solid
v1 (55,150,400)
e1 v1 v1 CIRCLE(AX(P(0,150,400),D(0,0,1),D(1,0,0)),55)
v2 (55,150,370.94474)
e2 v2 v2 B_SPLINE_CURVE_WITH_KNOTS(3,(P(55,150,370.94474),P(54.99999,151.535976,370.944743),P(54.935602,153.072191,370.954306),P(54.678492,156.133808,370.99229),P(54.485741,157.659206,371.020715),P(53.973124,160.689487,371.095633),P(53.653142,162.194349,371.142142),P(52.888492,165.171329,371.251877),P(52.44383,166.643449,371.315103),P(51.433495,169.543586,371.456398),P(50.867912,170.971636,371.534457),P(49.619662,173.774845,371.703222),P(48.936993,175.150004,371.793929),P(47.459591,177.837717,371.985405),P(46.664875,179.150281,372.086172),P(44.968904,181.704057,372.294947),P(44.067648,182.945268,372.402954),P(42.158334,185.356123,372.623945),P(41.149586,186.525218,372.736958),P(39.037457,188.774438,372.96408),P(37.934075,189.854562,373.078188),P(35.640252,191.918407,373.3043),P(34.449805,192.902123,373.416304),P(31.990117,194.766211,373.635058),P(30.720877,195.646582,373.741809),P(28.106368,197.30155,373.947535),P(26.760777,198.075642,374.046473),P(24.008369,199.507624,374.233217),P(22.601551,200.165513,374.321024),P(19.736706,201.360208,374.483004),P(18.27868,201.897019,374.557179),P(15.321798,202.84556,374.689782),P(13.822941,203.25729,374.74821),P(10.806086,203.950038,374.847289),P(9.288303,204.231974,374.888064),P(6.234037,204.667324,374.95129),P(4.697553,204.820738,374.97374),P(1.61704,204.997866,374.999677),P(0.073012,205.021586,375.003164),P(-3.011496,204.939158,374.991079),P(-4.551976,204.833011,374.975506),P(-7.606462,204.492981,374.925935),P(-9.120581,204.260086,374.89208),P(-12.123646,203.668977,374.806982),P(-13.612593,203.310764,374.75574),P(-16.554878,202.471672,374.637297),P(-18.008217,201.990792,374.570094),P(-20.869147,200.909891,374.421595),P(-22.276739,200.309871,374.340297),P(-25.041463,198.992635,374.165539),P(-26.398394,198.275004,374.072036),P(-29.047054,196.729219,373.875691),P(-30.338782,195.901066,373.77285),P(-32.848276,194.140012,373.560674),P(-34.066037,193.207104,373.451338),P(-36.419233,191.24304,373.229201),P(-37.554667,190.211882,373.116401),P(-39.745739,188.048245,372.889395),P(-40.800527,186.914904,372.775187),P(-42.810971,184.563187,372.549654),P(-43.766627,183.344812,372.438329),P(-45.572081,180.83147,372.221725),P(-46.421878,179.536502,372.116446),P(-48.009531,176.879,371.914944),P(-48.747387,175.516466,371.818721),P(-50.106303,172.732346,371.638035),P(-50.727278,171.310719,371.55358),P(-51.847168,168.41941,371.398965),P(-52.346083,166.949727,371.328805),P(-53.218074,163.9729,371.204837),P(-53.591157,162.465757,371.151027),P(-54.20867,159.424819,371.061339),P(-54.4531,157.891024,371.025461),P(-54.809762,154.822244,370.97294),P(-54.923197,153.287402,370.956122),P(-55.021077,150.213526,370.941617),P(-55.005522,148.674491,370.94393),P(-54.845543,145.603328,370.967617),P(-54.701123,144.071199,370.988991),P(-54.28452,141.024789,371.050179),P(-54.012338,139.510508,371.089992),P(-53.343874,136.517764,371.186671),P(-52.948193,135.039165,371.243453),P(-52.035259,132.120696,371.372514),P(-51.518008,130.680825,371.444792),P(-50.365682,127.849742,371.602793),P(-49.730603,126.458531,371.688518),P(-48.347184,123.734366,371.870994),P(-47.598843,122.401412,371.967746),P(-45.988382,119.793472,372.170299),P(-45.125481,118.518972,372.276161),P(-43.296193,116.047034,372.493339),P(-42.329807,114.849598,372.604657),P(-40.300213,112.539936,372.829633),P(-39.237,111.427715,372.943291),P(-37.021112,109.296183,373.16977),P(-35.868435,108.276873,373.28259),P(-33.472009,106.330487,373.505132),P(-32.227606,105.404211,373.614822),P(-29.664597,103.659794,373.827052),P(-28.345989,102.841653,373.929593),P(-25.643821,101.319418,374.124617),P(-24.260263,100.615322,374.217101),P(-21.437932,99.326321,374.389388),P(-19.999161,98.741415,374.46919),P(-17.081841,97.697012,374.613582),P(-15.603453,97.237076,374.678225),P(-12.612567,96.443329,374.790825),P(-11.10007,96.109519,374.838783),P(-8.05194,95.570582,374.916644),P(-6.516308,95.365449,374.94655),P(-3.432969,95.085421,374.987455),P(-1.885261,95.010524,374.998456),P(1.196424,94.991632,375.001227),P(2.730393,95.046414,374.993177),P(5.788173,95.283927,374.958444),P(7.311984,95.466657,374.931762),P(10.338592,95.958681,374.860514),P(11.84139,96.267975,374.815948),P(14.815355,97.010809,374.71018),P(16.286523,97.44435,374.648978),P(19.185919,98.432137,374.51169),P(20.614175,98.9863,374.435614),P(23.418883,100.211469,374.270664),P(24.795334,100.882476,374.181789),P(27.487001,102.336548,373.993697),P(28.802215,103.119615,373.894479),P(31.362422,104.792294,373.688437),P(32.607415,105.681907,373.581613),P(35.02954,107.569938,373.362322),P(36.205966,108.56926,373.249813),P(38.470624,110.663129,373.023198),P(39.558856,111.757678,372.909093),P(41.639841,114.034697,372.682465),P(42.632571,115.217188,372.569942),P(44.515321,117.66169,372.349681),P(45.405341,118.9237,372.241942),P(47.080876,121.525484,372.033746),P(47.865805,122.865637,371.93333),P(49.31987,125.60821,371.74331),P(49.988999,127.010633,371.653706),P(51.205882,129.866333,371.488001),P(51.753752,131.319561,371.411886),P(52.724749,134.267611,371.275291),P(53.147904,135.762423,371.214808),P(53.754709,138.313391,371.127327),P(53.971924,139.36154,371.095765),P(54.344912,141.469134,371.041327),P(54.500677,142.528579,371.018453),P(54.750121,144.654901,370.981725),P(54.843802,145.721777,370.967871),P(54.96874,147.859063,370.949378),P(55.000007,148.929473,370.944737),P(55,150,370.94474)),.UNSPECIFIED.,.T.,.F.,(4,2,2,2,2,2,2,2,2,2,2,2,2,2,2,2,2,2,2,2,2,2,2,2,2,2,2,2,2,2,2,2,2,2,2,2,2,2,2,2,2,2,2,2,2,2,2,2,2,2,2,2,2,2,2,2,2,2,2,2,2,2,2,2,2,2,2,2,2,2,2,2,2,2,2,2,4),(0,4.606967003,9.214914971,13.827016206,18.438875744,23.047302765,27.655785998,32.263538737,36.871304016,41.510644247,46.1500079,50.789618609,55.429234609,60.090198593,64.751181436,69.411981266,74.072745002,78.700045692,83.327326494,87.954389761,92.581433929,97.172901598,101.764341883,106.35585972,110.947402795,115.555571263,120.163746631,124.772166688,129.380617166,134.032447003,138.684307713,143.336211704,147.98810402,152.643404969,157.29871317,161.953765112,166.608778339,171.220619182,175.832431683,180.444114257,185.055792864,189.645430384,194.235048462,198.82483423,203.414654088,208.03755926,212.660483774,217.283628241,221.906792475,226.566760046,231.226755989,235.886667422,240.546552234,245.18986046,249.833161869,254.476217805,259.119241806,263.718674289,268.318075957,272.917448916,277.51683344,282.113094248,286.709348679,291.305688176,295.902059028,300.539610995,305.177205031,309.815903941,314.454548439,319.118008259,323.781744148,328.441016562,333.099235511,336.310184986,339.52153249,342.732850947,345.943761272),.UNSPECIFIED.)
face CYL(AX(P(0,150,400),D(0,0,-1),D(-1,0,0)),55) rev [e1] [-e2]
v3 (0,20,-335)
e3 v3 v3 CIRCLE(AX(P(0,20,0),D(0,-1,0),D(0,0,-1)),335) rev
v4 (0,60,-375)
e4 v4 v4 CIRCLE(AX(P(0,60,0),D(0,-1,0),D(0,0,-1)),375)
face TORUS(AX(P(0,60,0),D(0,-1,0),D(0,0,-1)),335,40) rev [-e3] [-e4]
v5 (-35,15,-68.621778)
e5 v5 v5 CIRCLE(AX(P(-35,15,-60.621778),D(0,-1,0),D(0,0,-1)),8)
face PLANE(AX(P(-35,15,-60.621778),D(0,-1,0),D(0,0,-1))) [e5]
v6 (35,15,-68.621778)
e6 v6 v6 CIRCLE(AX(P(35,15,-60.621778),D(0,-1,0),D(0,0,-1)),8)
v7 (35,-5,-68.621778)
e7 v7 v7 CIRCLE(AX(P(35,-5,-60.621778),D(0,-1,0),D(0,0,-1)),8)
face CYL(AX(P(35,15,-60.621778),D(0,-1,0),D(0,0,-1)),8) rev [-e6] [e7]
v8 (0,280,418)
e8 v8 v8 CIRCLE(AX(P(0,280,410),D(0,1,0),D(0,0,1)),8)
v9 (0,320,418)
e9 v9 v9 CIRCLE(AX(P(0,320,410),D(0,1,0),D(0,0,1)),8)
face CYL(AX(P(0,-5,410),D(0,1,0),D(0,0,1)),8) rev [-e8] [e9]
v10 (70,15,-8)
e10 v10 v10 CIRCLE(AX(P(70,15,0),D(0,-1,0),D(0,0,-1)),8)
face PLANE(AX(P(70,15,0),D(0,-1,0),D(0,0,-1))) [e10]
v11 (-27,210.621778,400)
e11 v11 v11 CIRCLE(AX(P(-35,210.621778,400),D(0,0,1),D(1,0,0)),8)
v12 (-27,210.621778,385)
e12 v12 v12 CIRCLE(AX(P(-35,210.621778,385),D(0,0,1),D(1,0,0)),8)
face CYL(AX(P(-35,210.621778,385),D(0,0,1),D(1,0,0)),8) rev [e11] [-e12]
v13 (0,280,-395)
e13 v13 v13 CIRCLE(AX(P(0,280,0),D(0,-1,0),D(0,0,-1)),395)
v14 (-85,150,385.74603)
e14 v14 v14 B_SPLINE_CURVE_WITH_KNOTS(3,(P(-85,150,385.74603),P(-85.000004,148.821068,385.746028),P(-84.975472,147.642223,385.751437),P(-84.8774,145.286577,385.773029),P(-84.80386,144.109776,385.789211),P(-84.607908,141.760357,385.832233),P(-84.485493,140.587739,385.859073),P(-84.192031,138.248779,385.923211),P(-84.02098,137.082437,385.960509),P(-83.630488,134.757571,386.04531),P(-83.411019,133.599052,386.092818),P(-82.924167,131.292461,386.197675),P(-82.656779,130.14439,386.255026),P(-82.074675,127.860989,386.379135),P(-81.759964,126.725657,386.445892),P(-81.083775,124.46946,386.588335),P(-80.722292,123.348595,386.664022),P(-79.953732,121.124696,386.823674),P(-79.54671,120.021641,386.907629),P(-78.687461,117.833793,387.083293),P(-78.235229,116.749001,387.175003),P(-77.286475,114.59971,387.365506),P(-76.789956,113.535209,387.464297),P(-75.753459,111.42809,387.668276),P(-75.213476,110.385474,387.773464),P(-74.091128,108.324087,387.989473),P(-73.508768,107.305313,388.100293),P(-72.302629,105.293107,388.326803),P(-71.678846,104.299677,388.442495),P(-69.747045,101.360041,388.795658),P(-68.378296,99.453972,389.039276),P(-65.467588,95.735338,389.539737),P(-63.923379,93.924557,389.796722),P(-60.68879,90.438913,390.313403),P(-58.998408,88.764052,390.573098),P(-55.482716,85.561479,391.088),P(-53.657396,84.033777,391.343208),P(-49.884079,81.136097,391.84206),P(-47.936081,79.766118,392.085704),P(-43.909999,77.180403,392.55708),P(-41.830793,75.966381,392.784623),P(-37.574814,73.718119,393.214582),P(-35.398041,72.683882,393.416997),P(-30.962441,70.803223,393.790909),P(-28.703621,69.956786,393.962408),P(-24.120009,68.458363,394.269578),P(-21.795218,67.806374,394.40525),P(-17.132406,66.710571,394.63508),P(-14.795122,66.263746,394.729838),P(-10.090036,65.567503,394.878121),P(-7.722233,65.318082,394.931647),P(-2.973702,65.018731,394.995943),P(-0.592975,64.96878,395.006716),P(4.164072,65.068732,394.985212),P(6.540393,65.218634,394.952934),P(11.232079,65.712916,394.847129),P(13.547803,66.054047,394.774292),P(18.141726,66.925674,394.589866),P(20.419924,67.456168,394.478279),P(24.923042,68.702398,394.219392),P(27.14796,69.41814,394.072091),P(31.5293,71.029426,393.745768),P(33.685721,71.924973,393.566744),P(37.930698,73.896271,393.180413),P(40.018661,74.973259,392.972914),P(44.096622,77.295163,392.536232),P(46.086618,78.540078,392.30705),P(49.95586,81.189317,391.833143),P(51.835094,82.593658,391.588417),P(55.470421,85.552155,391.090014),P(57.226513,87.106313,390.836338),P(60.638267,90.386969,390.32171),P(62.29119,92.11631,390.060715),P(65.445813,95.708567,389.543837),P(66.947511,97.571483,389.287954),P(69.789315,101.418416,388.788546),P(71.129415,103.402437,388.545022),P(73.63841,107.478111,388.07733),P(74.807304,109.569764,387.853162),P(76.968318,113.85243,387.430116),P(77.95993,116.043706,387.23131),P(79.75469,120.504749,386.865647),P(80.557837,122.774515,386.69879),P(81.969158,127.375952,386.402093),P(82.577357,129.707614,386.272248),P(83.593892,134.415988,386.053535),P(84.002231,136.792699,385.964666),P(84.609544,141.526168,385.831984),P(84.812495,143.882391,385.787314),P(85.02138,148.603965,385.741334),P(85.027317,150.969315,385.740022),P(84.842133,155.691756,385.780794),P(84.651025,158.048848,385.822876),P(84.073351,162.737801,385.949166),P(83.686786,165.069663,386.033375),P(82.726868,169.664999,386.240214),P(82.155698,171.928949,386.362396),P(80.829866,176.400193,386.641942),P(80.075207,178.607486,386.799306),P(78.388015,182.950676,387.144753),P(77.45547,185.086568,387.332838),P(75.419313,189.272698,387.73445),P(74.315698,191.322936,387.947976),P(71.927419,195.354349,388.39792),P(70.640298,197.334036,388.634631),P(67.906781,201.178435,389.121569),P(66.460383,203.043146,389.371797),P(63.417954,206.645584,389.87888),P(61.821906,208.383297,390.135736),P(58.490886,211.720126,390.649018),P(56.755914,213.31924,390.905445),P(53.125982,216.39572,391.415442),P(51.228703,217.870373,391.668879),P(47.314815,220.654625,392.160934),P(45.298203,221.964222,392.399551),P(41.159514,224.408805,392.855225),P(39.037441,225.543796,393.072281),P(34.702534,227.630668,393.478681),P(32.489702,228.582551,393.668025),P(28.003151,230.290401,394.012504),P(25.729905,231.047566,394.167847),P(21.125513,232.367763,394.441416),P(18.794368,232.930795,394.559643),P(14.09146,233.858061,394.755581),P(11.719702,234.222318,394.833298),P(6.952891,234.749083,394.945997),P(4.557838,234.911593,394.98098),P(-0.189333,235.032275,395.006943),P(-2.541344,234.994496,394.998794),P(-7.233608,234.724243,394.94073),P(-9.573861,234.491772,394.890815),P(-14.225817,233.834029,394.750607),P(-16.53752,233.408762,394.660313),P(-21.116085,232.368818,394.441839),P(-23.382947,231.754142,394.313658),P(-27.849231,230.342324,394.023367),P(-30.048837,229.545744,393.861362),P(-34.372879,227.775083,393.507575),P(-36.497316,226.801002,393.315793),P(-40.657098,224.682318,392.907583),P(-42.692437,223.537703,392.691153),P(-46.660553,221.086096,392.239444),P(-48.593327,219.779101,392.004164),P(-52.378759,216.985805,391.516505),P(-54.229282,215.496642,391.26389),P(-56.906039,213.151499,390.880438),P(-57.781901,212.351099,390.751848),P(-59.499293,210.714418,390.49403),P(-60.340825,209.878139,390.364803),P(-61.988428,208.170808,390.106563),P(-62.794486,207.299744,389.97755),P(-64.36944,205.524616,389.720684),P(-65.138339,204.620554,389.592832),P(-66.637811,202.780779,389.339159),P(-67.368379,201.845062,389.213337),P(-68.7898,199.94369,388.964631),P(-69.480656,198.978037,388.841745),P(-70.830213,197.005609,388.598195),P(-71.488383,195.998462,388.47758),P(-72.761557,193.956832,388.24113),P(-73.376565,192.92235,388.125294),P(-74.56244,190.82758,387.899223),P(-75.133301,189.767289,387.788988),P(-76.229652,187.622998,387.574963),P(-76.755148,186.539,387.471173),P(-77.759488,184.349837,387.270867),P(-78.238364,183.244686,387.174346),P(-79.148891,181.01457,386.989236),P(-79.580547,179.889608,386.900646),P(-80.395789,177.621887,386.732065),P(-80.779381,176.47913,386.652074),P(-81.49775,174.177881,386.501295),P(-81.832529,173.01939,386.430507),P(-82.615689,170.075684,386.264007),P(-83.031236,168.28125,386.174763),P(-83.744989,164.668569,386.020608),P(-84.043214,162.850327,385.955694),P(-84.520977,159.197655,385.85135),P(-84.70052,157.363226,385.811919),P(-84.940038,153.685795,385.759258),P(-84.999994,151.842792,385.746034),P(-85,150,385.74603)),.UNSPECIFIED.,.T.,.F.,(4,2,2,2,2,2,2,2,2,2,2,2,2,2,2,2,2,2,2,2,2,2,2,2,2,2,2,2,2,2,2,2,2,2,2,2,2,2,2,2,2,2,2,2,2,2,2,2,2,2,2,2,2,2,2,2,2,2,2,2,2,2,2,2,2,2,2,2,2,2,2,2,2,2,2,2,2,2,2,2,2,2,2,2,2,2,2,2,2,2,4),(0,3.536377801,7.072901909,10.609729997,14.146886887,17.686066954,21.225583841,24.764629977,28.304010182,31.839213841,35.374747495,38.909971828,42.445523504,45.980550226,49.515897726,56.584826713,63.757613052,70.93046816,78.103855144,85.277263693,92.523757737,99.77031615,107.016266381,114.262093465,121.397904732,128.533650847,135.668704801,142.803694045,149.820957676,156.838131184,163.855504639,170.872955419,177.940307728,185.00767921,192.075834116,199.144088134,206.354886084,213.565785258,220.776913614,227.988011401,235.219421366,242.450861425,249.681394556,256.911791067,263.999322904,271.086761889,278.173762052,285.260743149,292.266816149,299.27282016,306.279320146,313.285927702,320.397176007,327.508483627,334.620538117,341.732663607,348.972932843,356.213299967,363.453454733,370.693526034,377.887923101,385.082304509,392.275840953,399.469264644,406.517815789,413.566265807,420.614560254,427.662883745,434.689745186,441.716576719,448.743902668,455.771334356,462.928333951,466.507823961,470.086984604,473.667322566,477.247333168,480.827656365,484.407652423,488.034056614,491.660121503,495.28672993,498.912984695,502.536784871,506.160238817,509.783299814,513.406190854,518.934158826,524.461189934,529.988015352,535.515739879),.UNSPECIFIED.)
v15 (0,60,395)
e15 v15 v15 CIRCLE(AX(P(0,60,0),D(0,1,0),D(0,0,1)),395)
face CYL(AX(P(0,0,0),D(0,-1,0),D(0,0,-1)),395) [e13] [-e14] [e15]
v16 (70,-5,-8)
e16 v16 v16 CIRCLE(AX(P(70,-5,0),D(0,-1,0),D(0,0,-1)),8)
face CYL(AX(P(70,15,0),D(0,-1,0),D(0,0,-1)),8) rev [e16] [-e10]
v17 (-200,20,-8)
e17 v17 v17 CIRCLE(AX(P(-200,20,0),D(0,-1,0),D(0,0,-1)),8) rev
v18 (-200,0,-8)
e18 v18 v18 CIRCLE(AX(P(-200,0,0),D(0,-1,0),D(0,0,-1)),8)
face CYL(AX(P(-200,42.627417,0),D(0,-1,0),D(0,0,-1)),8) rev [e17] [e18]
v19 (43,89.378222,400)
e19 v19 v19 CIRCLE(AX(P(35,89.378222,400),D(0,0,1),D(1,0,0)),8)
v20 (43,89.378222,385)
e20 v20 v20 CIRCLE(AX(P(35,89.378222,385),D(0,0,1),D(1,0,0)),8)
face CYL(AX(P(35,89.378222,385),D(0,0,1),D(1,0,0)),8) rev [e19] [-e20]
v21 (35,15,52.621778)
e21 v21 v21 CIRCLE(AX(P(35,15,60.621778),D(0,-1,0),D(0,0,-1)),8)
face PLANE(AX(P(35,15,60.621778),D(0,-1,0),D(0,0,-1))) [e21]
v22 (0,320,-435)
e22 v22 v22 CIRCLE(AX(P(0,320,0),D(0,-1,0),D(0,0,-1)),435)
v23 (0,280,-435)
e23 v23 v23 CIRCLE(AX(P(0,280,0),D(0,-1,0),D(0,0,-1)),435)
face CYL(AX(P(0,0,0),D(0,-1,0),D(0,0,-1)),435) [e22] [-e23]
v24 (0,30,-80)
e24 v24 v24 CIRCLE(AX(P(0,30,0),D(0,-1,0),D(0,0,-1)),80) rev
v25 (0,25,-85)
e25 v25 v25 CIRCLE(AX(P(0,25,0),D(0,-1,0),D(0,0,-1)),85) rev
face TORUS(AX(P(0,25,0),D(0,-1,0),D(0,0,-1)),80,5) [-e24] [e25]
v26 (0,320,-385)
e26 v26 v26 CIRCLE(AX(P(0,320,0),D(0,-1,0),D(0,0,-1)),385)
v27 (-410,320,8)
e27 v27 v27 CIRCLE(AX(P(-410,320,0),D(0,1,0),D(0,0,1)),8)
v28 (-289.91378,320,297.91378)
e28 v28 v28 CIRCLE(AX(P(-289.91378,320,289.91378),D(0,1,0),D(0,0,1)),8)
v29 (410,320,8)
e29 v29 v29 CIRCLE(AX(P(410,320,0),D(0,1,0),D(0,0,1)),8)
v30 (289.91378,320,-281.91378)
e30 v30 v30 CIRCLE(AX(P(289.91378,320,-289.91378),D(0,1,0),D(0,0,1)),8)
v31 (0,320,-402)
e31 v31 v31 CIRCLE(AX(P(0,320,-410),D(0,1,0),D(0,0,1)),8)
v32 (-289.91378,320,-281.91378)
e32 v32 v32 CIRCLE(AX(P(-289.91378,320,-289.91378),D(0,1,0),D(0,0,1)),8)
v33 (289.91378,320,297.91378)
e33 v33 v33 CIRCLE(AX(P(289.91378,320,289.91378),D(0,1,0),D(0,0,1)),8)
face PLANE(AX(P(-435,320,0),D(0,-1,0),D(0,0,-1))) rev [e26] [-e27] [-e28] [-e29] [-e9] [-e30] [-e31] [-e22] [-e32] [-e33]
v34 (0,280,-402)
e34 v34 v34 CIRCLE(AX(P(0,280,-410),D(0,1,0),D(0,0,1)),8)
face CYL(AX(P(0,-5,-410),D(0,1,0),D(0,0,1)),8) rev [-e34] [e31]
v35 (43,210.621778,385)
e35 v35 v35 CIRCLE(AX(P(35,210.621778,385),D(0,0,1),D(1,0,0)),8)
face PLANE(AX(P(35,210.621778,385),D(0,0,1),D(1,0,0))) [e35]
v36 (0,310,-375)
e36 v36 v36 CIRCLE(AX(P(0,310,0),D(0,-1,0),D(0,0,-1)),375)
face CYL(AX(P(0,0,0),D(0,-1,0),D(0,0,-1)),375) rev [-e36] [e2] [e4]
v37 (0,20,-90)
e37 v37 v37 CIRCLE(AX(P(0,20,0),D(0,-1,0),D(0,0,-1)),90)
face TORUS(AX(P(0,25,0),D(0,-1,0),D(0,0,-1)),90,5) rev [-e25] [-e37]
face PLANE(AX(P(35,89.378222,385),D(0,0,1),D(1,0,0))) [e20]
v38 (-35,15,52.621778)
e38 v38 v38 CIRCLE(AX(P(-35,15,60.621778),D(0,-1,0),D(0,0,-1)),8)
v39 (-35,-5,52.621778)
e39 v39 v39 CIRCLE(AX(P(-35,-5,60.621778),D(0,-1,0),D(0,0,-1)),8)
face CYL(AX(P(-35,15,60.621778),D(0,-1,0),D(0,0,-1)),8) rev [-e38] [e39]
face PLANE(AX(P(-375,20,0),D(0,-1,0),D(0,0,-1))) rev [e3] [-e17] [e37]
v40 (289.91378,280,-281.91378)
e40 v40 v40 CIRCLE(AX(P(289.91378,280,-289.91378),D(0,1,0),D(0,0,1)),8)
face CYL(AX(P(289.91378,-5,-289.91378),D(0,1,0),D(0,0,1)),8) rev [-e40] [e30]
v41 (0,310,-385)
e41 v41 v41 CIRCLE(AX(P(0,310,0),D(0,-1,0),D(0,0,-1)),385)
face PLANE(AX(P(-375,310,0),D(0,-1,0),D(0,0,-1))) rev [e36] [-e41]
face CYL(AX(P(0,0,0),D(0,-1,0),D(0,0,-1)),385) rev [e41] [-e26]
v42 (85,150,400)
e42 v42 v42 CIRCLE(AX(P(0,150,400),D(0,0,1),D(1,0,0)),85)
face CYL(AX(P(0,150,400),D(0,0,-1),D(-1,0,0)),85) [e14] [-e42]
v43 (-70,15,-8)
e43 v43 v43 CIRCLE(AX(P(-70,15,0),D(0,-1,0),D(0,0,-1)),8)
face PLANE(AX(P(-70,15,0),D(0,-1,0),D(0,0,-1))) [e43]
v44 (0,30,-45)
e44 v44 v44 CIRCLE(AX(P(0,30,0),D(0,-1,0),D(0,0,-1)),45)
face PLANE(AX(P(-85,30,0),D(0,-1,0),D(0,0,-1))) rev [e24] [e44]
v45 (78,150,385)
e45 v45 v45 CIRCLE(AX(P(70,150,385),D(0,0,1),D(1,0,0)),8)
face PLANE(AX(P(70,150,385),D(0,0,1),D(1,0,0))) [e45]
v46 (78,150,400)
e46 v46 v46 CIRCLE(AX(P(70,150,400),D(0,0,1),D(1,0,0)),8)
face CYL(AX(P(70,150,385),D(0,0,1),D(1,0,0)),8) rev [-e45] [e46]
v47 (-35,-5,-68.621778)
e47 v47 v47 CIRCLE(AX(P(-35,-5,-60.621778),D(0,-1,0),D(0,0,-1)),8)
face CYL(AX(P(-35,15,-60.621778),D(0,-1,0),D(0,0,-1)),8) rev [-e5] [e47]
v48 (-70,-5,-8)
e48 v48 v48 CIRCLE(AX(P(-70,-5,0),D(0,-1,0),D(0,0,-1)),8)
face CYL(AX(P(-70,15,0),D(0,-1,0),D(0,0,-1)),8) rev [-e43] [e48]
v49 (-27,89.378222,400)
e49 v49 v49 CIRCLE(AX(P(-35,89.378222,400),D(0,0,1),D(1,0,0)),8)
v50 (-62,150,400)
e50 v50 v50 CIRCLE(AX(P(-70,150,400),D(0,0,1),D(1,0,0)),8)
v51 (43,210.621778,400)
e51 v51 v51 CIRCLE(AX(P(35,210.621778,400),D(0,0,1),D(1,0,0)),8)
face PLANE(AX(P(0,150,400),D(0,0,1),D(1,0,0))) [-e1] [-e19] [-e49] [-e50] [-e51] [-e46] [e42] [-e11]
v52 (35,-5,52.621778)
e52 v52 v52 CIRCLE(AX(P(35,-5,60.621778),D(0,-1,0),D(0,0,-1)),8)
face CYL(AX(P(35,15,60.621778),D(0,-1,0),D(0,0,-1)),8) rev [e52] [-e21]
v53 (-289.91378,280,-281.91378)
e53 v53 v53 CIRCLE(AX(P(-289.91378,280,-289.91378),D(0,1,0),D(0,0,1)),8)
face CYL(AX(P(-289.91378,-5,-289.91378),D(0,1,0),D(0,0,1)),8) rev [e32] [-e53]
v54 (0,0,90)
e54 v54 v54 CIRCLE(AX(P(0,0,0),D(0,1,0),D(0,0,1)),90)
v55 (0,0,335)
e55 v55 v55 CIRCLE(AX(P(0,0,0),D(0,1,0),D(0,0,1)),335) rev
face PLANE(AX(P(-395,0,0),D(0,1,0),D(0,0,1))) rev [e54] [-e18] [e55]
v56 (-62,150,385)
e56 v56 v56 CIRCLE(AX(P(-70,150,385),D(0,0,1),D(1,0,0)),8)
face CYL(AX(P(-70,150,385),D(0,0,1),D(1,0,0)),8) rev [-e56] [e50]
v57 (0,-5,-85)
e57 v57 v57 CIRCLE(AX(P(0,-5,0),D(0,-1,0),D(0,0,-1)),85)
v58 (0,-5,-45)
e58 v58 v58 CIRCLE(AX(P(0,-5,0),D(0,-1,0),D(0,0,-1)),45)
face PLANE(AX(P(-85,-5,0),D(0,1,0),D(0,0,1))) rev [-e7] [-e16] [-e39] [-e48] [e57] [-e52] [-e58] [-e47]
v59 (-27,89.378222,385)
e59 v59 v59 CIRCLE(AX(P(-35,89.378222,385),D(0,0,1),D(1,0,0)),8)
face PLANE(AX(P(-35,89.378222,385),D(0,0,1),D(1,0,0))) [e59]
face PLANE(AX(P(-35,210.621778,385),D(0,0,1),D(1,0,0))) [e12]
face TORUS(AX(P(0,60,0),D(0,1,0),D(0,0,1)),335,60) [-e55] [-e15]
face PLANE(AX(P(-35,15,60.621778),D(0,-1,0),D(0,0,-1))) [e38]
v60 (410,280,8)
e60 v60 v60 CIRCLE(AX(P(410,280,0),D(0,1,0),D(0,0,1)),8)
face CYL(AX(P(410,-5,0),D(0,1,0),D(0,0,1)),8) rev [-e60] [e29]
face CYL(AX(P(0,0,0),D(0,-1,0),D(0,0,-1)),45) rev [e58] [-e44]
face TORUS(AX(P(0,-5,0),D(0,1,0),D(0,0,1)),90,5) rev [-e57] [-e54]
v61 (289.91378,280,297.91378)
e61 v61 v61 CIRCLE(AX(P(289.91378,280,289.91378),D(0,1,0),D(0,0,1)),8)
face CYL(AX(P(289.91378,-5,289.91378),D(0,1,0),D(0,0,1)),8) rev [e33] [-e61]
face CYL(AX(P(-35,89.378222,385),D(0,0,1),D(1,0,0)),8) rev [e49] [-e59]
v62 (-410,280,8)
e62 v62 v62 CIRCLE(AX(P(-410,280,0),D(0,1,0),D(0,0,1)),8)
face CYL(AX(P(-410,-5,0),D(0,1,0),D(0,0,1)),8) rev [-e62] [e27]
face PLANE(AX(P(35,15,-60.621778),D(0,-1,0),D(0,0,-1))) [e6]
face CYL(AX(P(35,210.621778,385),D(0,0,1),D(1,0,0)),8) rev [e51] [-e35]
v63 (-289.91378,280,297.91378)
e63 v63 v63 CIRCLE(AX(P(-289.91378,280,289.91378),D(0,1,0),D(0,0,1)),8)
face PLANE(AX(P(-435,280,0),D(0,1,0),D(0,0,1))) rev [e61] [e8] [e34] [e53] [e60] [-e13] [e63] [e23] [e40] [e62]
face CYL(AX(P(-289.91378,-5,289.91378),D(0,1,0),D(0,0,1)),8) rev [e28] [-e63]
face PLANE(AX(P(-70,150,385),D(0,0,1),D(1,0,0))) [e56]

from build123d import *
from build123d.topology import SkipClean

# Parameters (mm, degrees)
FILLET1_R                            = 5
FILLET2_R                            = 60
FILLET3_R                            = 40
SKETCH2_R                            = 85
SKETCH2_R_2                          = 55
BOSS_EXTRUDE1_DEPTH                  = 5
BOSS_EXTRUDE1_DIRECTION_2_REACH      = 992.215
BOSS_EXTRUDE1_DIRECTION_2_END_RADIUS = 395
SKETCH3_R                            = 55
CUT_EXTRUDE1_DEPTH                   = 64
SKETCH4_R                            = 8
CUT_EXTRUDE2_DEPTH                   = 15
CUT_EXTRUDE3_DEPTH                   = 696.754985609
CUT_EXTRUDE3_DEPTH_BACK              = 696.754985609
SKETCH5_R                            = 8
SKETCH6_R                            = 8
CUT_EXTRUDE4_DEPTH                   = 20
SKETCH7_R                            = 8
CUT_EXTRUDE5_DEPTH                   = 20


with BuildPart() as part:
    # Sketch1 → Revolve1 (revolve)
    with BuildSketch(Plane.XY, mode=Mode.PRIVATE) as revolve1_sk:
        Polygon((-435, 320), (-385, 320), (-385, 310), (-375, 310), (-375, 20), (-85, 20), (-85, 30), (-45, 30), (-45, -5), (-85, -5), (-85, 0), (-395, 0), (-395, 280), (-435, 280), align=None)
    revolve(revolve1_sk.sketch.rotate(Axis((0, 0, 0), (0, 1, 0)), 270), axis=Axis((0, 0, 0), (0, 1, 0)))

    # Fillet1
    fillet1_edges = [part.edges().sort_by_distance(p)[0] for p in [
        (0, 0, 85),
        (0, 30, 85),
        (0, 20, 85),
    ]]
    fillet(fillet1_edges, radius=FILLET1_R - 0.0001)  # a hair under: the kernel refuses the full size

    # Fillet2
    fillet2_edges = [part.edges().sort_by_distance(p)[0] for p in [
        (0, 0, 395),
    ]]
    fillet(fillet2_edges, radius=FILLET2_R)

    # Fillet3
    fillet3_edges = [part.edges().sort_by_distance(p)[0] for p in [
        (0, 20, 375),
    ]]
    fillet(fillet3_edges, radius=FILLET3_R)

    # Sketch2 → Boss-Extrude1 (add)
    with BuildSketch(Plane.XY.offset(395)):
        with Locations(Location((0, 150, 0), (0, 0, 180))):
            Circle(SKETCH2_R)
        with Locations((0, 150)):
            Circle(SKETCH2_R_2, mode=Mode.SUBTRACT)
    extrude(amount=BOSS_EXTRUDE1_DEPTH)

    # Boss-Extrude1 direction 2: up to this cylinder (the profile starts outside it)
    with SkipClean():  # the faces are left unmerged after this step: merging them gives an invalid solid
        boss_extrude1_direction_2_end = Plane(origin=(0, 150, 0), z_dir=(0, -1, 0)) * Cylinder(BOSS_EXTRUDE1_DIRECTION_2_END_RADIUS, 2775.43, mode=Mode.PRIVATE)
        # Sketch2 → Boss-Extrude1 direction 2 (add, up to the surface)
        with BuildSketch(Plane.XY.offset(395), mode=Mode.PRIVATE) as boss_extrude1_direction_2_sk1:
            with Locations(Location((0, 150, 0), (0, 0, 180))):
                Circle(SKETCH2_R)
            with Locations((0, 150)):
                Circle(SKETCH2_R_2, mode=Mode.SUBTRACT)
        boss_extrude1_direction_2_tool1 = extrude(boss_extrude1_direction_2_sk1.sketch, amount=-BOSS_EXTRUDE1_DIRECTION_2_REACH, mode=Mode.PRIVATE) - boss_extrude1_direction_2_end
        add(boss_extrude1_direction_2_tool1.solids().sort_by_distance((82.595837, 150, 395))[0])
        add(boss_extrude1_direction_2_tool1.solids().sort_by_distance((82.595837, 150, 395))[1])

    # Sketch3 → Cut-Extrude1 (cut)
    with BuildSketch(Plane.XY.offset(400)):
        with Locations((0, 150)):
            Circle(SKETCH3_R)
    extrude(amount=-CUT_EXTRUDE1_DEPTH, mode=Mode.SUBTRACT)

    # Sketch4 → Cut-Extrude2 (cut)
    with BuildSketch(Plane.XY.offset(400)):
        with Locations((70, 150)):
            Circle(SKETCH4_R)
        with Locations((35, 89.378221735)):
            Circle(SKETCH4_R)
        with Locations((-35, 89.378221735)):
            Circle(SKETCH4_R)
        with Locations((-70, 150)):
            Circle(SKETCH4_R)
        with Locations((-35, 210.621778265)):
            Circle(SKETCH4_R)
        with Locations((35, 210.621778265)):
            Circle(SKETCH4_R)
    extrude(amount=-CUT_EXTRUDE2_DEPTH, mode=Mode.SUBTRACT)

    # Sketch5 → Cut-Extrude3 (cut, two sides: drawn at the far end of the back side and taken through both)
    with BuildSketch(Plane(origin=(0, 320, 0), x_dir=(1, 0, 0), z_dir=(0, 1, 0)).offset(-CUT_EXTRUDE3_DEPTH_BACK)):
        with Locations(Location((410, 0, 0), (0, 0, 270))):
            Circle(SKETCH5_R)
        with Locations(Location((289.913780286, -289.913780286, 0), (0, 0, 270))):
            Circle(SKETCH5_R)
        with Locations(Location((0, -410, 0), (0, 0, 270))):
            Circle(SKETCH5_R)
        with Locations(Location((-289.913780286, -289.913780286, 0), (0, 0, 270))):
            Circle(SKETCH5_R)
        with Locations(Location((-410, 0, 0), (0, 0, 270))):
            Circle(SKETCH5_R)
        with Locations(Location((-289.913780286, 289.913780286, 0), (0, 0, 270))):
            Circle(SKETCH5_R)
        with Locations(Location((0, 410, 0), (0, 0, 270))):
            Circle(SKETCH5_R)
        with Locations(Location((289.913780286, 289.913780286, 0), (0, 0, 270))):
            Circle(SKETCH5_R)
    extrude(amount=CUT_EXTRUDE3_DEPTH + CUT_EXTRUDE3_DEPTH_BACK, mode=Mode.SUBTRACT)

    # Sketch6 → Cut-Extrude4 (cut)
    with BuildSketch(Plane.XZ.offset(5)):
        with Locations(Location((70, 0, 0), (0, 0, 270))):
            Circle(SKETCH6_R)
        with Locations(Location((35, -60.621778265, 0), (0, 0, 270))):
            Circle(SKETCH6_R)
        with Locations(Location((-35, -60.621778265, 0), (0, 0, 270))):
            Circle(SKETCH6_R)
        with Locations(Location((-70, 0, 0), (0, 0, 270))):
            Circle(SKETCH6_R)
        with Locations(Location((-35, 60.621778265, 0), (0, 0, 270))):
            Circle(SKETCH6_R)
        with Locations(Location((35, 60.621778265, 0), (0, 0, 270))):
            Circle(SKETCH6_R)
    extrude(amount=-CUT_EXTRUDE4_DEPTH, mode=Mode.SUBTRACT)

    # Sketch7 → Cut-Extrude5 (cut)
    with BuildSketch(Plane.XZ):
        with Locations(Location((-200, 0, 0), (0, 0, 270))):
            Circle(SKETCH7_R)
    extrude(amount=-CUT_EXTRUDE5_DEPTH, mode=Mode.SUBTRACT)


solid = part.part
